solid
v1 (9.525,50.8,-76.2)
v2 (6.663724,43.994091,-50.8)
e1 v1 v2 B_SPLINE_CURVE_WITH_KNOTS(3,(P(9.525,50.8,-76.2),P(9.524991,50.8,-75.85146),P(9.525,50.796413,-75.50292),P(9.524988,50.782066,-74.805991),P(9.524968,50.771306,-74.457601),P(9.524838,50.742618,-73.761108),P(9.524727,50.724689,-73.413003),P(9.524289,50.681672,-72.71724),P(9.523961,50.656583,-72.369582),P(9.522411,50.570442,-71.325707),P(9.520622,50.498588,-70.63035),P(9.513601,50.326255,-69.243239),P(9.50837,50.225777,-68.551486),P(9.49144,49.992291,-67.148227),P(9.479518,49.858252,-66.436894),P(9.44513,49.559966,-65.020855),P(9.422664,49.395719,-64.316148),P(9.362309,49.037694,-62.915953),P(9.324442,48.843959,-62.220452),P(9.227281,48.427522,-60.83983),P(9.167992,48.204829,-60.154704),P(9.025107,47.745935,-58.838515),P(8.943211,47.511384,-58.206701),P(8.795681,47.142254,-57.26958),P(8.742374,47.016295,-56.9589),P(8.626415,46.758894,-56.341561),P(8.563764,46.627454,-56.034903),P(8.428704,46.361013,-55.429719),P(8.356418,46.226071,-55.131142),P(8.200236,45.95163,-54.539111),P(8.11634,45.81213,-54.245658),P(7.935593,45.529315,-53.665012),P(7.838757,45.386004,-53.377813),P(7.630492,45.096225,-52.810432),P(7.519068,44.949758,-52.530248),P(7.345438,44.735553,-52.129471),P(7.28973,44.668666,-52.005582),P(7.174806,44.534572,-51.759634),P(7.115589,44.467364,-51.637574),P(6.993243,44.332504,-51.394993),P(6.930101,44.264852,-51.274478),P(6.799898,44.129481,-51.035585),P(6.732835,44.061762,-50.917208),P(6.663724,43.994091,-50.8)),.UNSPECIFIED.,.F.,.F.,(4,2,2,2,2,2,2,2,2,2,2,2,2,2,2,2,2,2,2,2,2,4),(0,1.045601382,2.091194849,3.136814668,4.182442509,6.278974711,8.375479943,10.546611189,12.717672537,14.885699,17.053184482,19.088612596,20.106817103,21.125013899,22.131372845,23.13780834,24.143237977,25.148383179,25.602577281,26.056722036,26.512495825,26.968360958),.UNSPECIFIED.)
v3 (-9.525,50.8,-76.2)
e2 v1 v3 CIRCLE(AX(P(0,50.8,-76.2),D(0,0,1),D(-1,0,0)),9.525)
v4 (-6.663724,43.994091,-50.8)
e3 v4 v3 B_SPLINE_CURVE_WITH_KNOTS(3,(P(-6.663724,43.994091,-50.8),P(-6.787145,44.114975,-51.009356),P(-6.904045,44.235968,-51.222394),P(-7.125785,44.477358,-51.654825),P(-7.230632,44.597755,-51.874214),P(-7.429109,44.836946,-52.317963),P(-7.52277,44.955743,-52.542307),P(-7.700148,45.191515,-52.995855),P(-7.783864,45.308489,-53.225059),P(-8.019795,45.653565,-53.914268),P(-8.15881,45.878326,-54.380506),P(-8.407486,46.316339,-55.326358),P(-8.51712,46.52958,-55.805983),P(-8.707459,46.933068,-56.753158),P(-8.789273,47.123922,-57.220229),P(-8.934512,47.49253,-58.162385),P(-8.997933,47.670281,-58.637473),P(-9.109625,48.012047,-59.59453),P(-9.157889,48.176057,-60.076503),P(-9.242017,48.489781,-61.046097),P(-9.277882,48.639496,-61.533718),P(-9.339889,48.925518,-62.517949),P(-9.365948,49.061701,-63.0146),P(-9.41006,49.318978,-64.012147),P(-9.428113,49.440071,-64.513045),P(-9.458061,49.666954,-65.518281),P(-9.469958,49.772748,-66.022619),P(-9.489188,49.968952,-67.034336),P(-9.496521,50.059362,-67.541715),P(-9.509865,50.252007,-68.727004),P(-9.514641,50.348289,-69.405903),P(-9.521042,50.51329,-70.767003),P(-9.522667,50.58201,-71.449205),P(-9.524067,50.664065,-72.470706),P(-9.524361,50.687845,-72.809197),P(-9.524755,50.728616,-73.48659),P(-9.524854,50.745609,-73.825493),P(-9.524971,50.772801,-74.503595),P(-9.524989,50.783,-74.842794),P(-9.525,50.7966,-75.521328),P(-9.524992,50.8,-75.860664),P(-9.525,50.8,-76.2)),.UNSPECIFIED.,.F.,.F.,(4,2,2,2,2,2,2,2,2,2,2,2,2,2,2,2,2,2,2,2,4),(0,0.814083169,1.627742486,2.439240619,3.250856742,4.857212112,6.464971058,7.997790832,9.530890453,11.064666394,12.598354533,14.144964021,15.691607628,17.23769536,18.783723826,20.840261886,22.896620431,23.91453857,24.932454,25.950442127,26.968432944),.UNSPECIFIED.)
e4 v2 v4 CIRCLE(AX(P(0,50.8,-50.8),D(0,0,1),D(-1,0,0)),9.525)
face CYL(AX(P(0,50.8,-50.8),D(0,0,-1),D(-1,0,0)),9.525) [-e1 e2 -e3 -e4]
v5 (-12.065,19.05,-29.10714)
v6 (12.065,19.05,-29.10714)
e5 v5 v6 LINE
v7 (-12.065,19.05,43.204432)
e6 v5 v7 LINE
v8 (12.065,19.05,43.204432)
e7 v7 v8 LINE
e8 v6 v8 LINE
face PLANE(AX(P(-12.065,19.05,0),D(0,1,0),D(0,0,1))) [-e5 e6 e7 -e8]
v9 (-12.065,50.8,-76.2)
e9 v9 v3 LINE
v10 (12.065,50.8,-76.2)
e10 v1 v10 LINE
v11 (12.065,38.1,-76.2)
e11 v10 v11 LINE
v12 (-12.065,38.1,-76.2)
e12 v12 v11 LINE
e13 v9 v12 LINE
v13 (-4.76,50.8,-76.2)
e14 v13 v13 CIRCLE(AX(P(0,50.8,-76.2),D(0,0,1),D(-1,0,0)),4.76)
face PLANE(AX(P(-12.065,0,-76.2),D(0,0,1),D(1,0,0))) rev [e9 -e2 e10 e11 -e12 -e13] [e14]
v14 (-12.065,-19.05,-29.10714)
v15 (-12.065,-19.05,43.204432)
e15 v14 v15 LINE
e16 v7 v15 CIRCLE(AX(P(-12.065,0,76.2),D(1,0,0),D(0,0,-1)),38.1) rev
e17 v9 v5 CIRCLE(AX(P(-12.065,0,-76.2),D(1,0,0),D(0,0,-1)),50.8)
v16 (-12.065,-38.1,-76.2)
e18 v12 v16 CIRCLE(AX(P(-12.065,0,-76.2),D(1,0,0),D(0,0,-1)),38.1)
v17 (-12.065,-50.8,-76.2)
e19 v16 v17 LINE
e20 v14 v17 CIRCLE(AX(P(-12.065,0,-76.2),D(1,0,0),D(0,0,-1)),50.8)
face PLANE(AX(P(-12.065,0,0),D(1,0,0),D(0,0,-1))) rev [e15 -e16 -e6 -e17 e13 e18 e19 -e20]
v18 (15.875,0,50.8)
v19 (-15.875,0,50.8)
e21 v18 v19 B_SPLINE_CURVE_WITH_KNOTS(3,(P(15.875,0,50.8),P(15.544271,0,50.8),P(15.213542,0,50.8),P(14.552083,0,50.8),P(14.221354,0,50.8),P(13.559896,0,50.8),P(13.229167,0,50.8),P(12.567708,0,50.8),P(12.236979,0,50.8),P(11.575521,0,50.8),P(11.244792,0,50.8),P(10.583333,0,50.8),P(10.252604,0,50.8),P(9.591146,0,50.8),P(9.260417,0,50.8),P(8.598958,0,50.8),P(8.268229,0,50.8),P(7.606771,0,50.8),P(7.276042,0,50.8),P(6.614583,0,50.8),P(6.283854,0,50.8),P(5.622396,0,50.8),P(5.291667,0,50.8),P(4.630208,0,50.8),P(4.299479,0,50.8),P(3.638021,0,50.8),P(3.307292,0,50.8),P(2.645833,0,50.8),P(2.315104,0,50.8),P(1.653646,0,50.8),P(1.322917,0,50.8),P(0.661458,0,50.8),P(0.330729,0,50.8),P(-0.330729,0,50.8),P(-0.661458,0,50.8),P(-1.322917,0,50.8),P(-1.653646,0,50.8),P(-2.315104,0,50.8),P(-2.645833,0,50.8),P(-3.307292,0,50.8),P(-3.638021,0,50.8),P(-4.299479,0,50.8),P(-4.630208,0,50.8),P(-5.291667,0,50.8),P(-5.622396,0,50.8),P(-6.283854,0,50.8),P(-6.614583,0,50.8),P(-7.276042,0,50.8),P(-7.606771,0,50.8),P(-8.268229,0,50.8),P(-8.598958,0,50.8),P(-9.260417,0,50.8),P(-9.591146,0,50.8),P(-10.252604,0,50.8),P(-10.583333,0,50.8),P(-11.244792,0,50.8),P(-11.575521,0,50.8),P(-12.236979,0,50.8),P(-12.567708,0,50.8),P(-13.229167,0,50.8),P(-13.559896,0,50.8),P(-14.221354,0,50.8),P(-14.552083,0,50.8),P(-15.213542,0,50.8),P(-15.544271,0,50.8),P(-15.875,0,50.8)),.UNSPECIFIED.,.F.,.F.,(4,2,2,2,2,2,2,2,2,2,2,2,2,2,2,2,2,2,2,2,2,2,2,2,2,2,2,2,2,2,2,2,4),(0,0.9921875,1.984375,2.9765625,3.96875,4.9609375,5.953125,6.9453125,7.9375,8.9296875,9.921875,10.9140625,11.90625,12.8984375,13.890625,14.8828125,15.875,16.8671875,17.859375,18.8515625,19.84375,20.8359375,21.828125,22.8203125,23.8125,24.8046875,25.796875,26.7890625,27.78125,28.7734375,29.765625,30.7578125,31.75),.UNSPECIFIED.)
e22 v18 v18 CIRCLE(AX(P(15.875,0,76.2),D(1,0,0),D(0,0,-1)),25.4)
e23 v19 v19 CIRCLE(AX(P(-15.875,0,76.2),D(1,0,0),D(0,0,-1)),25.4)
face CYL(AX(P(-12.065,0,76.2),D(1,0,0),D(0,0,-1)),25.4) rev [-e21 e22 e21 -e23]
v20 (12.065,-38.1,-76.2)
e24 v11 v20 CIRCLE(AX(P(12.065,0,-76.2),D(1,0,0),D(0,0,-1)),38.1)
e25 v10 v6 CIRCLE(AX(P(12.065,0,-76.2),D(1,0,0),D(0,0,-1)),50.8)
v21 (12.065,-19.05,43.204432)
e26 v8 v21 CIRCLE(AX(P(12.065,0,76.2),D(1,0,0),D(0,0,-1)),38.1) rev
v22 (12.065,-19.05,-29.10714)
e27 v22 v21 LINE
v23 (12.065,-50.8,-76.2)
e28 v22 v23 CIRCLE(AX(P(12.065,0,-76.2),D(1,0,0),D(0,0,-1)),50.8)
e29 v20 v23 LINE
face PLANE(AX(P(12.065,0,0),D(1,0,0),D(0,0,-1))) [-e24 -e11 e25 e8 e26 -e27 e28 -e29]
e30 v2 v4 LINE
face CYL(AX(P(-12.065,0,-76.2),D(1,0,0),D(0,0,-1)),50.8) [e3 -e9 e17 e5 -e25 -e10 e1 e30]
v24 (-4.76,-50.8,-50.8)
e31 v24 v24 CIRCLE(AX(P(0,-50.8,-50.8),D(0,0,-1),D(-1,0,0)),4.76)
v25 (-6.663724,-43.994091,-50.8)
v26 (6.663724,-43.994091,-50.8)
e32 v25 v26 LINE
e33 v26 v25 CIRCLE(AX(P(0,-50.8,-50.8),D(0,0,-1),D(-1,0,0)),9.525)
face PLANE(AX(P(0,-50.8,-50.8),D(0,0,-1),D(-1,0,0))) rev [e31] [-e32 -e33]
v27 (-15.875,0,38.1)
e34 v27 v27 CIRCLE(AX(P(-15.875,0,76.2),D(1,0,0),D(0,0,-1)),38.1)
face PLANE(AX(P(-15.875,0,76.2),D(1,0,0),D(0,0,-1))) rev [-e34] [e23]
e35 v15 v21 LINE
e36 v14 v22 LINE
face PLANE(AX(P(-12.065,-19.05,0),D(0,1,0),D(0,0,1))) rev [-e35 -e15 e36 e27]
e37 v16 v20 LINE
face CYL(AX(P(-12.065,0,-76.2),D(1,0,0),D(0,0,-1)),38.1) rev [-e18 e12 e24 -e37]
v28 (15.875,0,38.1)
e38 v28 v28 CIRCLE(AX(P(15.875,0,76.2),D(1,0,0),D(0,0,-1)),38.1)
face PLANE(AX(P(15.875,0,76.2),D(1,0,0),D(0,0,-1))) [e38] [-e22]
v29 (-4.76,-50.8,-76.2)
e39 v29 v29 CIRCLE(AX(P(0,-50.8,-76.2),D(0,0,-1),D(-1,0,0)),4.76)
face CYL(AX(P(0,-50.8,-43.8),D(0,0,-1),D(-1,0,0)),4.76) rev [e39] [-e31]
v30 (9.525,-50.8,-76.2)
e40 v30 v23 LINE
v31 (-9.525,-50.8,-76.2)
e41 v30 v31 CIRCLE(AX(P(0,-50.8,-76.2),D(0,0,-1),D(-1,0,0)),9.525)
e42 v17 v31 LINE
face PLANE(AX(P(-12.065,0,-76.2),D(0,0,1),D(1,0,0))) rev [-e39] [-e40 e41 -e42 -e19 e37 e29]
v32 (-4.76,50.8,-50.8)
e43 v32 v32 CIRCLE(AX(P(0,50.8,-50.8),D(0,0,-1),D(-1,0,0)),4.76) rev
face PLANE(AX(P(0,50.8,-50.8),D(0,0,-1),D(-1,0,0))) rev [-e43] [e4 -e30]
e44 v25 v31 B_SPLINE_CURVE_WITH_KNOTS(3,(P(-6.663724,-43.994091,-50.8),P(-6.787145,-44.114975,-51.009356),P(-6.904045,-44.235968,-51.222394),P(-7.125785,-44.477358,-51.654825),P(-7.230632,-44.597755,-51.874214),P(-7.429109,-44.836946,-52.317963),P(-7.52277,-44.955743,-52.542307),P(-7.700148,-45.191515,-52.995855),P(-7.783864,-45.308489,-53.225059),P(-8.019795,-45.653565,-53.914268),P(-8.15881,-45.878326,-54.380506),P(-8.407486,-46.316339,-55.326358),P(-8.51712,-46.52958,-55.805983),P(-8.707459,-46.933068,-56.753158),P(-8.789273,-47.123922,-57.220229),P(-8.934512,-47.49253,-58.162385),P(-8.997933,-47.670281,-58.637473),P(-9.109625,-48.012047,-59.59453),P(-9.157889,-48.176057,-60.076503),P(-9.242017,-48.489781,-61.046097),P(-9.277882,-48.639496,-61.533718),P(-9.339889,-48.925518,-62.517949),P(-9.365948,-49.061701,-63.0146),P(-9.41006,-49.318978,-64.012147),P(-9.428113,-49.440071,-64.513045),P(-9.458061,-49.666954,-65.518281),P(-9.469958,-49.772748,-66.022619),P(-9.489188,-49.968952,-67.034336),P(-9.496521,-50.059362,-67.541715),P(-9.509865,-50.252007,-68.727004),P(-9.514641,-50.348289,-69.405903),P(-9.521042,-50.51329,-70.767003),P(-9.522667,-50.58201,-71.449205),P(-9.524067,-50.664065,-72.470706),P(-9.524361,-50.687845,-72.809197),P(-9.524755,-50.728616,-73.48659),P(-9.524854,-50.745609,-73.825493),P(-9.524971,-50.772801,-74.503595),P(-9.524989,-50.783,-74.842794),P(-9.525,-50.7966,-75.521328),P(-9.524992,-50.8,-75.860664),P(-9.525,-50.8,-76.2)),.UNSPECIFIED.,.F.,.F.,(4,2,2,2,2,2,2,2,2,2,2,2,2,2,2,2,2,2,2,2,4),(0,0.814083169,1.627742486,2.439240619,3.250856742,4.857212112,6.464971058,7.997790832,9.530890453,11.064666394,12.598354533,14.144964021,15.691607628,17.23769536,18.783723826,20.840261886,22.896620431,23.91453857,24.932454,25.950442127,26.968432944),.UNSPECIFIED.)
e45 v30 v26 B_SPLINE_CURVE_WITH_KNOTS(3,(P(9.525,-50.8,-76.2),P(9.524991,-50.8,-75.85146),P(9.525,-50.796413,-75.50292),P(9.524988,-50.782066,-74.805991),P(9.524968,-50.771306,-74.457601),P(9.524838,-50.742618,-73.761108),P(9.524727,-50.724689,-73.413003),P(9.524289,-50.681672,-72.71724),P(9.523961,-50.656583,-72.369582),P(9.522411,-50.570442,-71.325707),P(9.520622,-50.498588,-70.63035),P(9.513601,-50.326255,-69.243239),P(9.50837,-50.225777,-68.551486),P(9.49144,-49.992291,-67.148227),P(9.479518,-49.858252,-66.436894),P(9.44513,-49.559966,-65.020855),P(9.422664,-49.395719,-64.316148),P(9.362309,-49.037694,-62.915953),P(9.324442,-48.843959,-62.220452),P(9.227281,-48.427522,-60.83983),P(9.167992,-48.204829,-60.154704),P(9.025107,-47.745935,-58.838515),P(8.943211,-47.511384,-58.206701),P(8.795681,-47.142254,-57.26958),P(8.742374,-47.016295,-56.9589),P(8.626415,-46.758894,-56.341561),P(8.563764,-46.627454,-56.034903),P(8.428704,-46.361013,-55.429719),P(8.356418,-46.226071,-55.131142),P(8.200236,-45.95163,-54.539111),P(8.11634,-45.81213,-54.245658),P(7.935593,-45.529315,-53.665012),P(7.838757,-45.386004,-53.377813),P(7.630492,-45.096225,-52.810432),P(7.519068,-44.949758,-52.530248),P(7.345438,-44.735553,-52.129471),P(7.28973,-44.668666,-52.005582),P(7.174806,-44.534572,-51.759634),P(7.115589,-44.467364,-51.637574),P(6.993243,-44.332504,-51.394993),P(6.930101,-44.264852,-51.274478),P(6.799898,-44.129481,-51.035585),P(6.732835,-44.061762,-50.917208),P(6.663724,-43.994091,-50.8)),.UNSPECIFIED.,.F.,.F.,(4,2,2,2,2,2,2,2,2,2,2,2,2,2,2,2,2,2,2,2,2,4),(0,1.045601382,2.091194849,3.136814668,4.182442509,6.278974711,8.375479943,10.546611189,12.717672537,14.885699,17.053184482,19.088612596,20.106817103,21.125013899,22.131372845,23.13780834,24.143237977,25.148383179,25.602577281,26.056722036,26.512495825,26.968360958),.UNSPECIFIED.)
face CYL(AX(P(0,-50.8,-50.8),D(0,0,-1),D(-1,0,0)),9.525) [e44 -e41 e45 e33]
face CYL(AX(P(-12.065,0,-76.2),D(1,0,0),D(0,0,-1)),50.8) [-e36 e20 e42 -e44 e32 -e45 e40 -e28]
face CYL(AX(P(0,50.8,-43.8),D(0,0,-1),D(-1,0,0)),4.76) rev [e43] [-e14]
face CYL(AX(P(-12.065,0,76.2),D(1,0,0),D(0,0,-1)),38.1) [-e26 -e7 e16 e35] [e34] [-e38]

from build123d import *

# Parameters (mm, degrees)
SKETCH1_R           = 25.4
BOSS_EXTRUDE2_DEPTH = 12.065
SKETCH1_6_R         = 38.1
SKETCH1_6_R_2       = 25.4
BOSS_EXTRUDE3_DEPTH = 15.875
SKETCH3_R           = 9.525
BOSS_EXTRUDE4_DEPTH = 25.4
SKETCH5_R           = 4.76
CUT_EXTRUDE1_DEPTH  = 32.4


with BuildPart() as part:
    # Sketch1 → Boss-Extrude2 (new, symmetric)
    with BuildSketch(Plane(origin=(0, 0, 0), x_dir=(0, 0, -1), z_dir=(1, 0, 0))):
        with BuildLine():
            ThreePointArc((76.2, -38.1), (38.1, 0), (76.2, 38.1))
            Line((76.2, 38.1), (76.2, 50.8))
            ThreePointArc((76.2, 50.8), (47.801936686, 42.121134838), (29.107139607, 19.05))
            Line((29.107139607, 19.05), (-43.204432116, 19.05))
            ThreePointArc((-43.204432116, 19.05), (-114.3, 0), (-43.204432116, -19.05))
            Line((-43.204432116, -19.05), (29.107139607, -19.05))
            ThreePointArc((29.107139607, -19.05), (47.801936686, -42.121134838), (76.2, -50.8))
            Line((76.2, -50.8), (76.2, -38.1))
        make_face()
        with Locations((-76.2, 0)):
            Circle(SKETCH1_R, mode=Mode.SUBTRACT)
    extrude(amount=BOSS_EXTRUDE2_DEPTH, both=True)

    # Sketch1<6> → Boss-Extrude3 (add, symmetric)
    with BuildSketch(Plane(origin=(0, 0, 0), x_dir=(0, 0, -1), z_dir=(1, 0, 0))):
        with Locations((-76.2, 0)):
            Circle(SKETCH1_6_R)
        with Locations((-76.2, 0)):
            Circle(SKETCH1_6_R_2, mode=Mode.SUBTRACT)
    extrude(amount=BOSS_EXTRUDE3_DEPTH, both=True)

    # Sketch3 → Boss-Extrude4 (add)
    with BuildSketch(Plane(origin=(0, 0, -76.2), x_dir=(-1, 0, 0), z_dir=(0, 0, -1))):
        with Locations((0, -50.8)):
            Circle(SKETCH3_R)
    boss_extrude4 = extrude(amount=-BOSS_EXTRUDE4_DEPTH)

    # Sketch5 → Cut-Extrude1 (cut)
    with BuildSketch(Plane(origin=(0, 0, -76.2), x_dir=(-1, 0, 0), z_dir=(0, 0, -1))):
        with Locations((0, -50.8)):
            Circle(SKETCH5_R)
    cut_extrude1 = extrude(amount=-CUT_EXTRUDE1_DEPTH, mode=Mode.SUBTRACT)

    # Mirror2: Boss-Extrude4, Cut-Extrude1 across plane
    add(boss_extrude4.mirror(Plane.ZX))
    add(cut_extrude1.mirror(Plane.ZX), mode=Mode.SUBTRACT)


solid = part.part
